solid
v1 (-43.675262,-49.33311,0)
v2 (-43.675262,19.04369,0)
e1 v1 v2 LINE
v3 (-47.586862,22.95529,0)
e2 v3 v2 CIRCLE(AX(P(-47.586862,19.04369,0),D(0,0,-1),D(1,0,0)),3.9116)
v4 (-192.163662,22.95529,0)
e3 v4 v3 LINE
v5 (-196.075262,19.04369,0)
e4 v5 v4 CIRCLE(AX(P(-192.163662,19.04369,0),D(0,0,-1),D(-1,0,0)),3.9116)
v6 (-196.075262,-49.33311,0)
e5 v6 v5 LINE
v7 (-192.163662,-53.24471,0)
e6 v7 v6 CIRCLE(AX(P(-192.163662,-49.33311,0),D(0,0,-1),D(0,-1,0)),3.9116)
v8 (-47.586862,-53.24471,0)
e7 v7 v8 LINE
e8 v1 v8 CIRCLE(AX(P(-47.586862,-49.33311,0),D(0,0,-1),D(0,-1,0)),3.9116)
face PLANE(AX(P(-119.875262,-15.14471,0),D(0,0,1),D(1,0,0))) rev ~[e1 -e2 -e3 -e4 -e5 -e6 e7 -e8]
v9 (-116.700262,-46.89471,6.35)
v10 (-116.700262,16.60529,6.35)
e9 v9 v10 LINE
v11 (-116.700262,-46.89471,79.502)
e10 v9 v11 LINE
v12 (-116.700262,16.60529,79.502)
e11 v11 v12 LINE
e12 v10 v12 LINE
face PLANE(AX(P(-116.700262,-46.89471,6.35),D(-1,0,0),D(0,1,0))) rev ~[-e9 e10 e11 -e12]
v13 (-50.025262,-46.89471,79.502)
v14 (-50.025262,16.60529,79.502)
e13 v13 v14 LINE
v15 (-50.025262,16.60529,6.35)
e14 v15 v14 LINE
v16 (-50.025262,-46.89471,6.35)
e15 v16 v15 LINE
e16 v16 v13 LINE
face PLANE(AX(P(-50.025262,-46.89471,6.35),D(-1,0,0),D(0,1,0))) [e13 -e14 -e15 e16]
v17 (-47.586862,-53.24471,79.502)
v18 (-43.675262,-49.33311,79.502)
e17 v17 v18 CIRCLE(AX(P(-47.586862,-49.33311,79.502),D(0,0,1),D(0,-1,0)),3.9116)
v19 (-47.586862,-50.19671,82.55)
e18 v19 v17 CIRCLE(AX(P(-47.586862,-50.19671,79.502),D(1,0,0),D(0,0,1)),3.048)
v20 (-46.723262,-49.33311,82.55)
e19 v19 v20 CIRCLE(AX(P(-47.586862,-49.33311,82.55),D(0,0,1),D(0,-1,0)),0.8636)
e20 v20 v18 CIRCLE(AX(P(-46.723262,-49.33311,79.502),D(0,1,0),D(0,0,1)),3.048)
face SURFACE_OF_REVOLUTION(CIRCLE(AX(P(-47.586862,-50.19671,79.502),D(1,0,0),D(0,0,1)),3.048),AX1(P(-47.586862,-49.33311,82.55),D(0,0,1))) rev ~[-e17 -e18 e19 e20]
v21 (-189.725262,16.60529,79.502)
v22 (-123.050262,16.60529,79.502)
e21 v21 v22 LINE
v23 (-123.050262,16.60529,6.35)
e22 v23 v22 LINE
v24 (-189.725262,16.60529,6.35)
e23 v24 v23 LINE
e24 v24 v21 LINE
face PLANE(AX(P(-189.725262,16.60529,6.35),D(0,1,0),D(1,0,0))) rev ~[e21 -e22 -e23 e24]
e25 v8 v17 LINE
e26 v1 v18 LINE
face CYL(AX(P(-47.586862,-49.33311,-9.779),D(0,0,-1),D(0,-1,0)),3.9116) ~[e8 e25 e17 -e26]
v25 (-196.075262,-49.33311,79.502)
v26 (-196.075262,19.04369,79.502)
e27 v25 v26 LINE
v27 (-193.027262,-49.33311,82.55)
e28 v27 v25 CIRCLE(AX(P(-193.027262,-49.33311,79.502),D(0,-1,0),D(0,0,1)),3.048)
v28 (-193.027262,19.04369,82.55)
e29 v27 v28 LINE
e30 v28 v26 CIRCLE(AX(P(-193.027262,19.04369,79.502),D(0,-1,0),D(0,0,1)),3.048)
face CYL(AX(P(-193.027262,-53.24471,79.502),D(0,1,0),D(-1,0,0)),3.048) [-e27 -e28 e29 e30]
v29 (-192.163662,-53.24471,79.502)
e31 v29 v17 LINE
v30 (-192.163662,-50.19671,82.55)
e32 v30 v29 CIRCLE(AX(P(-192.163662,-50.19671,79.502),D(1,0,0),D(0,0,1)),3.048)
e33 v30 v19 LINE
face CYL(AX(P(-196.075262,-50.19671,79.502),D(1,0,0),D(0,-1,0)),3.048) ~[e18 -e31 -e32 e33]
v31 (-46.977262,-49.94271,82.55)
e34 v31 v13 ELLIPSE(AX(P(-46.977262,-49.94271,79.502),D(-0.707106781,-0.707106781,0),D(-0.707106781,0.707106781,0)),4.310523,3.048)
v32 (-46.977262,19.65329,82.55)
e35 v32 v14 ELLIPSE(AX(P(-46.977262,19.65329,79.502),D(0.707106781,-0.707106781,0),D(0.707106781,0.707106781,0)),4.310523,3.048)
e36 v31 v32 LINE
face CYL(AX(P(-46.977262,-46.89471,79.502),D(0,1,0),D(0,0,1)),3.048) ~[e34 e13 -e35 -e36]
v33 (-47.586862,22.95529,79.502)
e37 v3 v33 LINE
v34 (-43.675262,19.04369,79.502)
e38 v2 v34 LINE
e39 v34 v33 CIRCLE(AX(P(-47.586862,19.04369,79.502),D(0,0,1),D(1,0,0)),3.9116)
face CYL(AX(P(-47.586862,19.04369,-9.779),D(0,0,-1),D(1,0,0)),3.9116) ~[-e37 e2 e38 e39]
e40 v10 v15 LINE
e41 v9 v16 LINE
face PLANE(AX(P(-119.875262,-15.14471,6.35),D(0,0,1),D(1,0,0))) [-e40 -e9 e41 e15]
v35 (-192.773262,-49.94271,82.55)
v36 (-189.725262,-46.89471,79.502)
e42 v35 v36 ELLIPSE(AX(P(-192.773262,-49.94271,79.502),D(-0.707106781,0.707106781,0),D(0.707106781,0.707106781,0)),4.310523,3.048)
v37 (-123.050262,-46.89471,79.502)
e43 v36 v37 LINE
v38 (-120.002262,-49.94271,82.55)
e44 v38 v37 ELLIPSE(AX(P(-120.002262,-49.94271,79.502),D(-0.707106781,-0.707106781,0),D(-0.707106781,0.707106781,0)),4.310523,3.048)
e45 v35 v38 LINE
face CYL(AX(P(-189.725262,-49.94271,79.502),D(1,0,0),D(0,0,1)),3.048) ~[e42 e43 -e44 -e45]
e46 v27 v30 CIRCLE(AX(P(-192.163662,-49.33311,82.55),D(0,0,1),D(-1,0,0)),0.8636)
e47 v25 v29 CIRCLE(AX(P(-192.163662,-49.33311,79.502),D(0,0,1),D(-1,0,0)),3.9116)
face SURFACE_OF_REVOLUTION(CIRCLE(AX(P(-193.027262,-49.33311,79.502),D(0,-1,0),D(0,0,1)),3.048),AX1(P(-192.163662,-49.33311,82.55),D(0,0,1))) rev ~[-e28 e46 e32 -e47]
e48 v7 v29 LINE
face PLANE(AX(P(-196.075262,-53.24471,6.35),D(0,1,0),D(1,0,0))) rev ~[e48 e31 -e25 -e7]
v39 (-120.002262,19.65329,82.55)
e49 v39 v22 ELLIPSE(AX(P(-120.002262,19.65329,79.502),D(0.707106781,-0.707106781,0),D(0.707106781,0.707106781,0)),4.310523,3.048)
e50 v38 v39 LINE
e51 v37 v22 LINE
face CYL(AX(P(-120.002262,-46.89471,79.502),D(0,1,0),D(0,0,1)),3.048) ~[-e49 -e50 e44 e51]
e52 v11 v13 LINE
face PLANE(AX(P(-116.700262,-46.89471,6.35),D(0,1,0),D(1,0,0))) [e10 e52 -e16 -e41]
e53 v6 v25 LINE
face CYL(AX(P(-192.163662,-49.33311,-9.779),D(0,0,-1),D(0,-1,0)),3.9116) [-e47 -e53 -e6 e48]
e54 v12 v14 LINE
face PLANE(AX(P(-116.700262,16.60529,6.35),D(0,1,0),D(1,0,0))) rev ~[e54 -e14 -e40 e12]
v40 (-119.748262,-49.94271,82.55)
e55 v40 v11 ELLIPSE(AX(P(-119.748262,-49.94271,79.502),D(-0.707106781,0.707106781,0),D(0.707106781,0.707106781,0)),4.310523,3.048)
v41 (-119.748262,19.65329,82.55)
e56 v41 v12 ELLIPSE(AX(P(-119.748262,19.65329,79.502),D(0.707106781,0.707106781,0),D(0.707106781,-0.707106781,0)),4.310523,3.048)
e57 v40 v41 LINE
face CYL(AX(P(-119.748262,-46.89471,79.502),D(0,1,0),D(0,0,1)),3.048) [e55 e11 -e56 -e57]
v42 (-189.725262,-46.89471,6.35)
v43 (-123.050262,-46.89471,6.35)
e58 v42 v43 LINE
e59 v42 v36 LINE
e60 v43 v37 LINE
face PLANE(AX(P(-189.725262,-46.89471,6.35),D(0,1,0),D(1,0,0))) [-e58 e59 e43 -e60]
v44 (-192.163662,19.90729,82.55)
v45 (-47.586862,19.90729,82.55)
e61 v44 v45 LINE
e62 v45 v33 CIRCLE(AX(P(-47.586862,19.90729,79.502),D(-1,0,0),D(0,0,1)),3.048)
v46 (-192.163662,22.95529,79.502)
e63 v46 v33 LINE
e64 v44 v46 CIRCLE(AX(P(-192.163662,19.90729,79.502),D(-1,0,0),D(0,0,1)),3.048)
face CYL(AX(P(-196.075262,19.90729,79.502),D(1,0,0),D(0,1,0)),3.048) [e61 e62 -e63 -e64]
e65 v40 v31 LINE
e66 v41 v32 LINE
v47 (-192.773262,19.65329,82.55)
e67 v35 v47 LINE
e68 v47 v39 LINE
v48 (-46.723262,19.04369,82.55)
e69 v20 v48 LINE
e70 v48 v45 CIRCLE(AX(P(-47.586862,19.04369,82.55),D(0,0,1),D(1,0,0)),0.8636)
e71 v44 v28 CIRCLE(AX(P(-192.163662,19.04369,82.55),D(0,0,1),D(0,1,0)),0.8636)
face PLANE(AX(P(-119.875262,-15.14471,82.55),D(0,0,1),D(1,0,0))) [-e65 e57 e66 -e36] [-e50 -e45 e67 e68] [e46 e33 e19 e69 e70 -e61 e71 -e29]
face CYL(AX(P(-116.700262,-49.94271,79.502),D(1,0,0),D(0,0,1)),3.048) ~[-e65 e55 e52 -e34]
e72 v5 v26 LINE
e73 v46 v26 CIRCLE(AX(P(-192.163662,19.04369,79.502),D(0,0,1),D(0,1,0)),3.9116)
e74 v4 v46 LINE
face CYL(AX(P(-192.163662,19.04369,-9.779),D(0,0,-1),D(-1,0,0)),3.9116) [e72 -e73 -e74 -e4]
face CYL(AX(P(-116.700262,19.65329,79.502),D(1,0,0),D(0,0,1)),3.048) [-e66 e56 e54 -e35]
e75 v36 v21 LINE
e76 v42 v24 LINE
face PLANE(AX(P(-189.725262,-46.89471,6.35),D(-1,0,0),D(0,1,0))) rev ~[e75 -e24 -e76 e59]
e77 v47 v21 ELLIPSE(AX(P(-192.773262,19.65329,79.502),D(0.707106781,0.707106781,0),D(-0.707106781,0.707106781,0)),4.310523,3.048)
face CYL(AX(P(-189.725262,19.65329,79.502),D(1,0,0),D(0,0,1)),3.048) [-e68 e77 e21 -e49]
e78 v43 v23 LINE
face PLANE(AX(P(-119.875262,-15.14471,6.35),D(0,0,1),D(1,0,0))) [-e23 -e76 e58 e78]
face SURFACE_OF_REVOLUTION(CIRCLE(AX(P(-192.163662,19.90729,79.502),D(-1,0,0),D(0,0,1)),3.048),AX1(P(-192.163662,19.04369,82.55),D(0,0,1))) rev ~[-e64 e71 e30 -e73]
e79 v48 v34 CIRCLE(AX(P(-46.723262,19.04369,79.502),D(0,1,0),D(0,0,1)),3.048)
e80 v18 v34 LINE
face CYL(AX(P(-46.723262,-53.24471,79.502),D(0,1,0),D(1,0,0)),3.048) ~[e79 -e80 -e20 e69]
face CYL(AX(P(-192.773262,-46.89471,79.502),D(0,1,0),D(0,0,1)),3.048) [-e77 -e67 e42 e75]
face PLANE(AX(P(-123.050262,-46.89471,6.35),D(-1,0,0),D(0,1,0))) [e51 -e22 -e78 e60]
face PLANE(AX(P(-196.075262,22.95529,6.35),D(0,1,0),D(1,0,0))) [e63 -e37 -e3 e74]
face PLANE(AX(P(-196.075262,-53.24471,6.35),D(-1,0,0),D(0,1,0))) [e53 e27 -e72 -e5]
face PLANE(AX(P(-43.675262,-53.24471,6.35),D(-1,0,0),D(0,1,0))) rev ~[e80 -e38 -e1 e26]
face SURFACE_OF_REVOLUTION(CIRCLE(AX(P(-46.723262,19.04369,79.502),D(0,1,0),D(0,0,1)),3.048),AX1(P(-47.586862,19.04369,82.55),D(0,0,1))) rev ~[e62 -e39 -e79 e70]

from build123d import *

# Parameters (mm, degrees)
F0_W         = 152.4
F0_H         = 76.2
F1_DEPTH     = 6.35
F2_W         = 152.4
F2_H         = 76.2
F2_W_2       = 66.675
F2_H_2       = 63.5
F3_DEPTH     = 76.2
F4_R         = 3.048
F5_T1_DEPTH  = 92.329
F5_T4_ANGLE  = 90
F5_T6_ANGLE  = 90
F5_T8_ANGLE  = 90
F5_T10_ANGLE = 90


# Not quite as in the source:
# - a fillet or chamfer that OpenCascade refuses, or shapes differently, is made with other operations: its cross-section is extruded or revolved along the edge and cut away or added
# - a feature names something its author has since deleted; it is built from what else it names


with BuildPart() as f1:
    # F0 (on Top) → F1 (new body)
    with BuildSketch(Plane.XY):
        with Locations((-119.875261867, -15.1447099686)):
            Rectangle(F0_W, F0_H)
    extrude(amount=F1_DEPTH)

    # F2 (on face) → F3 (join)
    with BuildSketch(Plane.XY.offset(6.35)):
        with Locations((-119.875261867, -15.1447099686)):
            Rectangle(F2_W, F2_H)
        with Locations((-156.387761867, -15.1447099686)):
            Rectangle(F2_W_2, F2_H_2, mode=Mode.SUBTRACT)
        with Locations((-83.362761867, -15.1447099686)):
            Rectangle(F2_W_2, F2_H_2, mode=Mode.SUBTRACT)
    extrude(amount=F3_DEPTH)

    # F4
    f4_edges = [f1.edges().sort_by_distance(p)[0] for p in [
        (-196.075262, -15.14471, 82.55),
        (-119.875262, 22.95529, 82.55),
        (-43.675262, -15.14471, 82.55),
        (-119.875262, -53.24471, 82.55),
        (-123.050262, -15.14471, 82.55),
        (-156.387762, -46.89471, 82.55),
        (-189.725262, -15.14471, 82.55),
        (-156.387762, 16.60529, 82.55),
        (-83.362762, 16.60529, 82.55),
        (-50.025262, -15.14471, 82.55),
        (-83.362762, -46.89471, 82.55),
        (-116.700262, -15.14471, 82.55),
    ]]
    fillet(f4_edges, radius=F4_R)

    # F5: fillet of radius 3.9116 on 4 edges, made by hand

    # F5_s2 → F5_t1 (cut)
    with BuildSketch(Plane.XY.offset(-9.779)):
        with BuildLine():
            ThreePointArc((-47.586861867, -53.2447099686), (-44.8209429818, -52.0990288539), (-43.675261867, -49.3331099686))
            Line((-43.675261867, -49.3331099686), (-43.675261867, -53.2447099686))
            Line((-43.675261867, -53.2447099686), (-47.586861867, -53.2447099686))
        make_face()
        with BuildLine():
            ThreePointArc((-43.675261867, 19.0436900314), (-44.8209429818, 21.8096089167), (-47.586861867, 22.9552900314))
            Line((-47.586861867, 22.9552900314), (-43.675261867, 22.9552900314))
            Line((-43.675261867, 22.9552900314), (-43.675261867, 19.0436900314))
        make_face()
        with BuildLine():
            ThreePointArc((-192.163661867, -53.2447099686), (-194.9295807523, -52.0990288539), (-196.075261867, -49.3331099686))
            Line((-196.075261867, -49.3331099686), (-196.075261867, -53.2447099686))
            Line((-196.075261867, -53.2447099686), (-192.163661867, -53.2447099686))
        make_face()
        with BuildLine():
            ThreePointArc((-196.075261867, 19.0436900314), (-194.9295807523, 21.8096089167), (-192.163661867, 22.9552900314))
            Line((-192.163661867, 22.9552900314), (-196.075261867, 22.9552900314))
            Line((-196.075261867, 22.9552900314), (-196.075261867, 19.0436900314))
        make_face()
    extrude(amount=F5_T1_DEPTH, mode=Mode.SUBTRACT)

    # F5_s3 → F5_t4 (revolve, cut)
    with BuildSketch(Plane.YZ.offset(-192.163661867)):
        with BuildLine():
            ThreePointArc((19.9072900314, 82.55), (22.0625515005, 81.6572614691), (22.9552900314, 79.502))
            Line((22.9552900314, 79.502), (22.9552900314, 82.55))
            Line((22.9552900314, 82.55), (19.9072900314, 82.55))
        make_face()
    revolve(axis=Axis((-192.163661867, 19.0436900314, 82.55), (0, 0, 1)), revolution_arc=F5_T4_ANGLE, mode=Mode.SUBTRACT)

    # F5_s5 → F5_t6 (revolve, cut)
    with BuildSketch(Plane.XZ.offset(49.3331099686)):
        with BuildLine():
            ThreePointArc((-193.027261867, 82.55), (-195.1825233361, 81.6572614691), (-196.075261867, 79.502))
            Line((-196.075261867, 79.502), (-196.075261867, 82.55))
            Line((-196.075261867, 82.55), (-193.027261867, 82.55))
        make_face()
    revolve(axis=Axis((-192.163661867, -49.3331099686, 82.55), (0, 0, 1)), revolution_arc=F5_T6_ANGLE, mode=Mode.SUBTRACT)

    # F5_s7 → F5_t8 (revolve, cut)
    with BuildSketch(Plane.XZ.offset(-19.0436900314)):
        with BuildLine():
            ThreePointArc((-46.723261867, 82.55), (-44.568000398, 81.6572614691), (-43.675261867, 79.502))
            Line((-43.675261867, 79.502), (-43.675261867, 82.55))
            Line((-43.675261867, 82.55), (-46.723261867, 82.55))
        make_face()
    revolve(axis=Axis((-47.586861867, 19.0436900314, 82.55), (0, 0, 1)), revolution_arc=F5_T8_ANGLE, mode=Mode.SUBTRACT)

    # F5_s9 → F5_t10 (revolve, cut)
    with BuildSketch(Plane.YZ.offset(-47.586861867)):
        with BuildLine():
            ThreePointArc((-50.1967099686, 82.55), (-52.3519714376, 81.6572614691), (-53.2447099686, 79.502))
            Line((-53.2447099686, 79.502), (-53.2447099686, 82.55))
            Line((-53.2447099686, 82.55), (-50.1967099686, 82.55))
        make_face()
    revolve(axis=Axis((-47.586861867, -49.3331099686, 82.55), (0, 0, 1)), revolution_arc=F5_T10_ANGLE, mode=Mode.SUBTRACT)


solid = f1.part
